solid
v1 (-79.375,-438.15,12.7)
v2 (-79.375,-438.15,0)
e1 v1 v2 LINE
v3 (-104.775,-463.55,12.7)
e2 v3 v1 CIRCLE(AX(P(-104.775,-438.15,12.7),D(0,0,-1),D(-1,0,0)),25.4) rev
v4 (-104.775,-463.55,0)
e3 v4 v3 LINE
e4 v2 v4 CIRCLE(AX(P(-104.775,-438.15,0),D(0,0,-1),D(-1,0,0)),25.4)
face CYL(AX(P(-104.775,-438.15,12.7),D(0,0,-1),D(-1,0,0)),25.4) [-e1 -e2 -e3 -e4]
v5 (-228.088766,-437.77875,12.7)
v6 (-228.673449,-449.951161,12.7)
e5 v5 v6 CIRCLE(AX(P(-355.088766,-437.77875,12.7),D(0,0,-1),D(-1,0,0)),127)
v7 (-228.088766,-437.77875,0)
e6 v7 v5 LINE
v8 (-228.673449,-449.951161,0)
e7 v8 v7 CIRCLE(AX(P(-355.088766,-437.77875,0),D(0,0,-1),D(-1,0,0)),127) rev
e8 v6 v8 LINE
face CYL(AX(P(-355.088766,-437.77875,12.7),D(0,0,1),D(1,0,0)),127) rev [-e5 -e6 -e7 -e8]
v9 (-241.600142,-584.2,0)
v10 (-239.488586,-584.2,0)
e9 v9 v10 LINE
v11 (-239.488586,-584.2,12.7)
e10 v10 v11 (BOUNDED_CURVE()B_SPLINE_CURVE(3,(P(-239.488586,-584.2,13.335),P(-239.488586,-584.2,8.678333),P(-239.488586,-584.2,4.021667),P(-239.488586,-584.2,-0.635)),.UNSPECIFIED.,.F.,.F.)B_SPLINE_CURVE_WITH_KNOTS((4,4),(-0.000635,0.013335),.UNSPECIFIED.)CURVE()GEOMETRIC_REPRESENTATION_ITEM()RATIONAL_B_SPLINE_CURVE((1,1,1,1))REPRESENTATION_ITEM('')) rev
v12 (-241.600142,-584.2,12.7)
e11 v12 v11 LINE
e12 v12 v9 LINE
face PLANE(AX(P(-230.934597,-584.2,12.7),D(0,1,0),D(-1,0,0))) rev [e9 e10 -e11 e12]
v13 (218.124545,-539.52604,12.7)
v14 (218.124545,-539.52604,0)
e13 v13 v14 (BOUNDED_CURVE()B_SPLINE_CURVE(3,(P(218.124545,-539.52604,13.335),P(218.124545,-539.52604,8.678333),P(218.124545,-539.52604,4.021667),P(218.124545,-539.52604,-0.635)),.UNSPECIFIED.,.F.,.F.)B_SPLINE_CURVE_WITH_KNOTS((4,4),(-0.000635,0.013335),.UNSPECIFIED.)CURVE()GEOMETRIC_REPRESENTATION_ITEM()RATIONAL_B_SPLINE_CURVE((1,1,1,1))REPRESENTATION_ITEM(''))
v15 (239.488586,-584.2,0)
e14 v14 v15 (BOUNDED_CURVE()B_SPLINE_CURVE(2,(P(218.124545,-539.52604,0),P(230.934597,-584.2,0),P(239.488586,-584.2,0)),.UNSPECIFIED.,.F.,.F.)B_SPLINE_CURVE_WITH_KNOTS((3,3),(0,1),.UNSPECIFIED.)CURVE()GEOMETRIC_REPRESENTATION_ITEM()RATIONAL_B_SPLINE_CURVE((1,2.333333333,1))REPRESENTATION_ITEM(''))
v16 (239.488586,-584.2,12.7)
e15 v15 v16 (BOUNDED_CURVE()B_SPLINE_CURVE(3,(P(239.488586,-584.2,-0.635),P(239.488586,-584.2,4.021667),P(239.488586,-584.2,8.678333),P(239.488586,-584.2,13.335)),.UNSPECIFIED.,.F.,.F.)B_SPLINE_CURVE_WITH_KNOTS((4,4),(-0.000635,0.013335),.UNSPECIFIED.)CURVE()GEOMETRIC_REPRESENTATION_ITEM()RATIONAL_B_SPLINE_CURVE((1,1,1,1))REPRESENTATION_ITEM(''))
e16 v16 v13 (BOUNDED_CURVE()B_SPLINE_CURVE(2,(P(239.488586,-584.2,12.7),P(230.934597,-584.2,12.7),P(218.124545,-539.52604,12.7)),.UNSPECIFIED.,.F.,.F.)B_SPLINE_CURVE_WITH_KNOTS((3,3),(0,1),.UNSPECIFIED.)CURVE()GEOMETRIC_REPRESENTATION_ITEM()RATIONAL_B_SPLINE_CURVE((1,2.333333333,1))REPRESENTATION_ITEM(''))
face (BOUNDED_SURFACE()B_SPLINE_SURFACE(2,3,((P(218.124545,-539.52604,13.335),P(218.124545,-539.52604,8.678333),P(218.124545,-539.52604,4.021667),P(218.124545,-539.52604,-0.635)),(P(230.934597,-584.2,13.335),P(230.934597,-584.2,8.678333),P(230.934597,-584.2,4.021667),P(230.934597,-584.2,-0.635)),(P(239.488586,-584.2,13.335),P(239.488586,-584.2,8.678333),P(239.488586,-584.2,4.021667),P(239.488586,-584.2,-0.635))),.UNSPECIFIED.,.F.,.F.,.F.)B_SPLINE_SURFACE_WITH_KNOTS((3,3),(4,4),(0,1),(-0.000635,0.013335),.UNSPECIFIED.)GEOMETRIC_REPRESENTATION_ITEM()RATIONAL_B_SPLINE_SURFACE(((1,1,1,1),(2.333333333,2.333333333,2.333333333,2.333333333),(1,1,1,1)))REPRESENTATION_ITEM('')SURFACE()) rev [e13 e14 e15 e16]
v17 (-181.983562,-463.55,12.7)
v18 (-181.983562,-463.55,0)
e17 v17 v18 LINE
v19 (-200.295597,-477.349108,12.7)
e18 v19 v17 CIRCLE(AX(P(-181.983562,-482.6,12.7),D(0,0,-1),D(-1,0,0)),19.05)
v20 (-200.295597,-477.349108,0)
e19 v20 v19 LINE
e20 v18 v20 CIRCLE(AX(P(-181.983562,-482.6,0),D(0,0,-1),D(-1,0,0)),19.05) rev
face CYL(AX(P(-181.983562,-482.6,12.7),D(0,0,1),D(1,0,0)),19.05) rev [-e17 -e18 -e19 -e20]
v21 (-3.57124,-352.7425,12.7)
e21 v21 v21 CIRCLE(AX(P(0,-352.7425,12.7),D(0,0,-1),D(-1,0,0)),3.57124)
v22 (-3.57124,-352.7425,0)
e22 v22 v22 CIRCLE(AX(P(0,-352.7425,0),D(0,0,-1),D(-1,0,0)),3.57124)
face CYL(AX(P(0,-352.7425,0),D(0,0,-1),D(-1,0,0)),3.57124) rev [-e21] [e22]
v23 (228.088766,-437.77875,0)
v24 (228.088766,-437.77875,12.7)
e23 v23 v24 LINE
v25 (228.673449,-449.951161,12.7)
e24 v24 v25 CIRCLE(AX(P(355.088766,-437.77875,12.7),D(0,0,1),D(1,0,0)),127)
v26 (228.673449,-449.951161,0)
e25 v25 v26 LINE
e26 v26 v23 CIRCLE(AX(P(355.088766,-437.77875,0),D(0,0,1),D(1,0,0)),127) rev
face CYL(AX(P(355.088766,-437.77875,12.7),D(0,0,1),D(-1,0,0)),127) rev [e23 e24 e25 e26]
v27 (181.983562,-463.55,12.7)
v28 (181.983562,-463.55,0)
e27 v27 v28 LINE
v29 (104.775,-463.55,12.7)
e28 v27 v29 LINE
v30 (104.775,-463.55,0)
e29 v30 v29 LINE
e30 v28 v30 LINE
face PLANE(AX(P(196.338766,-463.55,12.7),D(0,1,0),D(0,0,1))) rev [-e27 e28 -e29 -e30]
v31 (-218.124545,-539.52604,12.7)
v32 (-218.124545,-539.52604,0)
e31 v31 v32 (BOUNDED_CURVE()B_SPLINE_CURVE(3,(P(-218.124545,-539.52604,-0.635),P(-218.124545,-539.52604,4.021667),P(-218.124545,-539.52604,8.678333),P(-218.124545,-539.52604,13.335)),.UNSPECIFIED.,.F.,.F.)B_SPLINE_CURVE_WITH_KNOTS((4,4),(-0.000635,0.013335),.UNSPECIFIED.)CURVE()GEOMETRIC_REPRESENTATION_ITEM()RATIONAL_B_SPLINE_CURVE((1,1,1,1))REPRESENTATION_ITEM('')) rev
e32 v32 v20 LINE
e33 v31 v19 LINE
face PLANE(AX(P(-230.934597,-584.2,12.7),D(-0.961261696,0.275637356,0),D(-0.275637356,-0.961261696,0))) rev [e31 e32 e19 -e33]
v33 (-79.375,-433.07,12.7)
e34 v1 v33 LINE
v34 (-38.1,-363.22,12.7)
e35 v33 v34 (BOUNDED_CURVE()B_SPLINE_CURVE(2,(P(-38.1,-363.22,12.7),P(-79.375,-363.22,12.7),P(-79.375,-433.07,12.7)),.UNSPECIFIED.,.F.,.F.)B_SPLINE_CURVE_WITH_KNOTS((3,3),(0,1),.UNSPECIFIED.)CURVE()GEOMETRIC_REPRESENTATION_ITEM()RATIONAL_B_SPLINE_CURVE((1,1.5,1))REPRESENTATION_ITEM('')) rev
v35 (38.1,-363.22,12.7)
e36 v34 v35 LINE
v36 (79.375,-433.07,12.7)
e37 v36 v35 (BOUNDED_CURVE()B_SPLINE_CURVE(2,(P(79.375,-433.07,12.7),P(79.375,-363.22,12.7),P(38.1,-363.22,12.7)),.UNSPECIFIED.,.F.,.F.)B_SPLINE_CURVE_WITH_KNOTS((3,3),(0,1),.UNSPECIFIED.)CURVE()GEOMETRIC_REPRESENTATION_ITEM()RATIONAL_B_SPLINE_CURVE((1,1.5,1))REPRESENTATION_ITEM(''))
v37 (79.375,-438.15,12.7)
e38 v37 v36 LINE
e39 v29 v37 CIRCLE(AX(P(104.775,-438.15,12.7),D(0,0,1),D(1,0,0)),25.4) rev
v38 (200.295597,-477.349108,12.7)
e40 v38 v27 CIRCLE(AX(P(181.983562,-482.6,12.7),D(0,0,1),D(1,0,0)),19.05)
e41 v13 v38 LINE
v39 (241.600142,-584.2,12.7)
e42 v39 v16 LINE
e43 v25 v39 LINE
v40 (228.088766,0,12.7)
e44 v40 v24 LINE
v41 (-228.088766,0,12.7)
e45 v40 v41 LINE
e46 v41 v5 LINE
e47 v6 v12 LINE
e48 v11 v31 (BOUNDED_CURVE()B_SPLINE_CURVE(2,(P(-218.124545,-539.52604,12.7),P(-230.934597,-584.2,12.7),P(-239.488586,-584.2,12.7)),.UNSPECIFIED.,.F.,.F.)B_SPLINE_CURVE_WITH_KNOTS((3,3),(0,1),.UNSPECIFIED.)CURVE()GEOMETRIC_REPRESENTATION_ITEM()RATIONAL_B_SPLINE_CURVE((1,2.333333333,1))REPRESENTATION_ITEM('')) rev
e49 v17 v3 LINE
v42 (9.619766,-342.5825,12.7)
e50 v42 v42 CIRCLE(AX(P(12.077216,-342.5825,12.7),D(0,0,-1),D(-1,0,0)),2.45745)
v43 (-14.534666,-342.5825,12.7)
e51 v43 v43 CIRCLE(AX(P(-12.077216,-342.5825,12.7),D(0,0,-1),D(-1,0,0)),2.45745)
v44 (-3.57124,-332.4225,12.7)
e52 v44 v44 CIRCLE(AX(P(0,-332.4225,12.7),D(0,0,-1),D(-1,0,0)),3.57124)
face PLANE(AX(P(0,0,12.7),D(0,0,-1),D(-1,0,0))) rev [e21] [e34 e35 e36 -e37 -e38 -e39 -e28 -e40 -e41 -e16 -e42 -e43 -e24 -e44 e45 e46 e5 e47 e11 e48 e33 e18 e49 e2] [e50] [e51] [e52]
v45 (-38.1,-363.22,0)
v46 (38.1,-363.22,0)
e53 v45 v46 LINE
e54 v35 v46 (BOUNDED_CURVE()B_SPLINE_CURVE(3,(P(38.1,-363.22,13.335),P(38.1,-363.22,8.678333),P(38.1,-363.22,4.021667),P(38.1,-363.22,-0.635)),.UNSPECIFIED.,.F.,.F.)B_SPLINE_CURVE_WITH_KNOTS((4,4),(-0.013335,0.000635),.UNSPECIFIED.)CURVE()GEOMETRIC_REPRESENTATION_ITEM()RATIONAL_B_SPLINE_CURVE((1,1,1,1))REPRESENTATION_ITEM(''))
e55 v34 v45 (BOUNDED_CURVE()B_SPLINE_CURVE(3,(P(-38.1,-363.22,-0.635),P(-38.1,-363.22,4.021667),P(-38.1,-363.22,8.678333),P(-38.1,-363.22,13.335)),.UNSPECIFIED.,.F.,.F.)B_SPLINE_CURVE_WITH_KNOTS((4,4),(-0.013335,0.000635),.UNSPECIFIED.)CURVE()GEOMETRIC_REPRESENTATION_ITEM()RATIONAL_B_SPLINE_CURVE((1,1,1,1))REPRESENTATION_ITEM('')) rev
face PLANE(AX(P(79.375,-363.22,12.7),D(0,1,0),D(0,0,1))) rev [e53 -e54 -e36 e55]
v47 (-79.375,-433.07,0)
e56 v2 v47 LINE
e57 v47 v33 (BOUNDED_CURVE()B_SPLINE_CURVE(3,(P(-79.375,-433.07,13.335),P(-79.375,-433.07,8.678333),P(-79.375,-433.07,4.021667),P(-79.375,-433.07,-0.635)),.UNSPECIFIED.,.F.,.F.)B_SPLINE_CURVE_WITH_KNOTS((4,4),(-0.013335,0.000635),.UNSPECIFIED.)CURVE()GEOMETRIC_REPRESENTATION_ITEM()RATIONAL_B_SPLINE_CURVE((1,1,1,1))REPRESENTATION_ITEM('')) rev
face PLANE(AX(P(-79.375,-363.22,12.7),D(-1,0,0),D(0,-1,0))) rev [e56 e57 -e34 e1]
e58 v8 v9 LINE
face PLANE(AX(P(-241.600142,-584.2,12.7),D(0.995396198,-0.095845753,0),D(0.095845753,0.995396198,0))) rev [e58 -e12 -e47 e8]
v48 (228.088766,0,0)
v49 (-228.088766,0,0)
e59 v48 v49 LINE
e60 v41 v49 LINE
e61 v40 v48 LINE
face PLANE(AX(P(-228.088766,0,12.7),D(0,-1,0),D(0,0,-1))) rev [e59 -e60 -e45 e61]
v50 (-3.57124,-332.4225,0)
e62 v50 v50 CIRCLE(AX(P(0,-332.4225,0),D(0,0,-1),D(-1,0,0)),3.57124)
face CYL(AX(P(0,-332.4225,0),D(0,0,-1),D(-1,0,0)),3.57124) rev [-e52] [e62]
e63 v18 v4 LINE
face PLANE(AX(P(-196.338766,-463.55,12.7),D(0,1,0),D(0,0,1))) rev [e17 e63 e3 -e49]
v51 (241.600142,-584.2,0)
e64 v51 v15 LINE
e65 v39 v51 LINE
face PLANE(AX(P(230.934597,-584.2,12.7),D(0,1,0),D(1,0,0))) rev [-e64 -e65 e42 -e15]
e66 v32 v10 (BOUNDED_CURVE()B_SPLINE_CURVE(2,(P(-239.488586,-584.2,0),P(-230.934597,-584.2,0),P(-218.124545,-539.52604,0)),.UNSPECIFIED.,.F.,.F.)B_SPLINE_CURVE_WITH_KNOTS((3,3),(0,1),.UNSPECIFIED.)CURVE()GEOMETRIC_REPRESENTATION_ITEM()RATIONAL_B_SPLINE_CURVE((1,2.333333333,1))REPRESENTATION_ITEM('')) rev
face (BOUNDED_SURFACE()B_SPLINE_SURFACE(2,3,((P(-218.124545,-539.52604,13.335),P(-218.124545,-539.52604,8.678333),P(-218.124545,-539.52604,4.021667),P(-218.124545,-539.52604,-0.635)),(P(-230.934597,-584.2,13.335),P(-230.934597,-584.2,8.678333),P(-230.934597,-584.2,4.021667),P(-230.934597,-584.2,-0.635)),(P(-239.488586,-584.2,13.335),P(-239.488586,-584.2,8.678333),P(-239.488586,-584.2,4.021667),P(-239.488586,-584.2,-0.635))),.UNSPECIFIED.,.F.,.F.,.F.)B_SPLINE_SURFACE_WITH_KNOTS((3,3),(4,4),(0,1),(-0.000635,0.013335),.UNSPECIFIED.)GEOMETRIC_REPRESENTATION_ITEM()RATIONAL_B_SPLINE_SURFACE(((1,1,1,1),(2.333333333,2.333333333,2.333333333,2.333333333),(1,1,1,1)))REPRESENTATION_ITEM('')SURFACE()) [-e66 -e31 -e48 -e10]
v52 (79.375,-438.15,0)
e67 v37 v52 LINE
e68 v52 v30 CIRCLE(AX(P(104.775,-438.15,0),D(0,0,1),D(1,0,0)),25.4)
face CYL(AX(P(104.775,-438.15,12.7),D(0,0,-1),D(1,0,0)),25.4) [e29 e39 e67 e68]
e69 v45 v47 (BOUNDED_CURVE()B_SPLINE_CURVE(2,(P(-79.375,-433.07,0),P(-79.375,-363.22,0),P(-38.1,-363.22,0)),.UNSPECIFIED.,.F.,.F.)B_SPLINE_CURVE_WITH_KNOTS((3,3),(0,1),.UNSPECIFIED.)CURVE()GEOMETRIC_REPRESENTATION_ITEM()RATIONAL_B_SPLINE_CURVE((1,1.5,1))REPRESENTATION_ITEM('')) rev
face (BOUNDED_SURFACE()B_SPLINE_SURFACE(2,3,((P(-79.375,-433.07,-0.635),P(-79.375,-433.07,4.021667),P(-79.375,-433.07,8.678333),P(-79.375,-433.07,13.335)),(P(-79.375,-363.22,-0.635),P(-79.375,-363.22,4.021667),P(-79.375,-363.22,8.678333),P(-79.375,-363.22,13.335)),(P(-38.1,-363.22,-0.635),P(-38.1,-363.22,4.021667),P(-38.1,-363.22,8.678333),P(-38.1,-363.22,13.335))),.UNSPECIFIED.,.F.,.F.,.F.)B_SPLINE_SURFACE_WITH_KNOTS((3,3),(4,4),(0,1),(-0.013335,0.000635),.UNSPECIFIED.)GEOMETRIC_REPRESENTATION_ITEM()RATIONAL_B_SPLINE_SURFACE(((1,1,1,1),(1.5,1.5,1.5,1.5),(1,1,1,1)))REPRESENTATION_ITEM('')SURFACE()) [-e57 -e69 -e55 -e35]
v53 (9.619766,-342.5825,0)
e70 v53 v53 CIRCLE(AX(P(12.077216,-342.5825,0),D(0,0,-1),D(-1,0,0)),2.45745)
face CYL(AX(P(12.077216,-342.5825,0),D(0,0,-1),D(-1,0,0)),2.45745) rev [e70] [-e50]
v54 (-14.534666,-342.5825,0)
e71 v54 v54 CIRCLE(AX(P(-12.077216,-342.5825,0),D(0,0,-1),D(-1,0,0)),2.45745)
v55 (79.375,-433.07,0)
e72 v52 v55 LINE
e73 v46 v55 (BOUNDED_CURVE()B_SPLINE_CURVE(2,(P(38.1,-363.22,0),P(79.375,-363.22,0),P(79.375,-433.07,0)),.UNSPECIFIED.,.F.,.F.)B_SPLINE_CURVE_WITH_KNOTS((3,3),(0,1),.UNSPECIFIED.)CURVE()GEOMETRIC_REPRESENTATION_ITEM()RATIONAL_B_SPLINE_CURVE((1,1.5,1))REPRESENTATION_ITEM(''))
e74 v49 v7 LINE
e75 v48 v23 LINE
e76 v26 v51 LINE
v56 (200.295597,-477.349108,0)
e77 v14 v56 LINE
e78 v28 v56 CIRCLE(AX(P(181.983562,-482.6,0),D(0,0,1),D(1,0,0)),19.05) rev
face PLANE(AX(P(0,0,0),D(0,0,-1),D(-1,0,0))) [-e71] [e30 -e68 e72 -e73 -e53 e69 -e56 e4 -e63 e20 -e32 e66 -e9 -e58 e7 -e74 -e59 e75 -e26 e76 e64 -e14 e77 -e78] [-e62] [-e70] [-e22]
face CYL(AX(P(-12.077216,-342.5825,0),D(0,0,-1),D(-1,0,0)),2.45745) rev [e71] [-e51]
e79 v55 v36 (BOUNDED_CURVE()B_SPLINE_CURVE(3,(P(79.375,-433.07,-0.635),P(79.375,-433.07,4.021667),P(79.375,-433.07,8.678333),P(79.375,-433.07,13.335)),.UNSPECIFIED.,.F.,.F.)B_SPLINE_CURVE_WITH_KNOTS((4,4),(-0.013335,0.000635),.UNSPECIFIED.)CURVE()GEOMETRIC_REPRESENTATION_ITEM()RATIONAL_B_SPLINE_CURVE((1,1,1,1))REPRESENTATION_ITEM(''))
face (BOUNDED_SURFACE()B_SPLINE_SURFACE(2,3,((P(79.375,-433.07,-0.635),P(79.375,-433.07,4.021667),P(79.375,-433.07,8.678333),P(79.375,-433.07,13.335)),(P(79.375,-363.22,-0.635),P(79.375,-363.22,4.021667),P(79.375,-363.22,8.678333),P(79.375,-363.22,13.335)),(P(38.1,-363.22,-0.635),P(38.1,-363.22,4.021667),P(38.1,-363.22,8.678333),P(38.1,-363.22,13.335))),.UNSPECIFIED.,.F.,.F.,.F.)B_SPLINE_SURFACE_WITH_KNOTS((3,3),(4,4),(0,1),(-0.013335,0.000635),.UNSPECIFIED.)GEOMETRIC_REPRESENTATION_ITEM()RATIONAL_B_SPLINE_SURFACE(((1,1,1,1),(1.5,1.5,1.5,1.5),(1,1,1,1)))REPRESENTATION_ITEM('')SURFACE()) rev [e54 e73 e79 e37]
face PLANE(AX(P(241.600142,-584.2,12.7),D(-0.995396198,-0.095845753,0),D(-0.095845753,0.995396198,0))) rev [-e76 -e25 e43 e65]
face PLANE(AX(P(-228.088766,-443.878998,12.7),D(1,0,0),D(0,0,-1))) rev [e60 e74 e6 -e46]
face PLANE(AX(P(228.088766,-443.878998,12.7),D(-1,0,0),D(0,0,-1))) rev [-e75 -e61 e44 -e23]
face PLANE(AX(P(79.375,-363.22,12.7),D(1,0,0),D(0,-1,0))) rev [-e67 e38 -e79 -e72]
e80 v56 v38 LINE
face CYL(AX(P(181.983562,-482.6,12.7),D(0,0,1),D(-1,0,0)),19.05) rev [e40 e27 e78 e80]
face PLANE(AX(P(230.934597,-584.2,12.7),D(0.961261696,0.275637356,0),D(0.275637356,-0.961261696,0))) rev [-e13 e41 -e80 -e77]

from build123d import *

# Parameters (mm, degrees)
BOSS_EXTRUDE1_DEPTH     = 12.7
FILLET2_SIZE            = 41.275
FILLET2_SIZE_2          = 69.85
FILLET3_R               = 25.4
FILLET4_R               = 19.05
FILLET6_R               = 127
CUT_EXTRUDE1_REACH      = 634.314
SKETCH3_W               = 241.600142069
SKETCH3_H               = 584.2
F_8_CLEARANCE_HOLE1_D   = 4.9149
F_1_4_CLEARANCE_HOLE1_D = 7.14248


with BuildPart() as part:
    # Sketch1 → Boss-Extrude1 (new body)
    with BuildSketch(Plane.XY):
        Polygon((-228.088766336, 0), (228.088766336, 0), (228.088766336, -443.878997916), (241.600142069, -584.2), (230.934597128, -584.2), (196.338766336, -463.55), (79.375, -463.55), (79.375, -363.22), (-79.375, -363.22), (-79.375, -463.55), (-196.338766336, -463.55), (-230.934597128, -584.2), (-241.600142069, -584.2), (-228.088766336, -443.878997916), align=None)
    extrude(amount=BOSS_EXTRUDE1_DEPTH)

    # Fillet2
    # a fillet whose section is not a circle: 69.85, 41.275 mm, written as the material it adds along each edge
    with BuildSketch(Plane(origin=(-79.375, -363.22, 0), x_dir=(1, 0, 0), z_dir=(0, 0, 1))) as fillet2_piece_1:
        with BuildLine():
            Bezier((FILLET2_SIZE, 0), (0, 0), (0, -FILLET2_SIZE_2), weights=[1, 1.5, 1])
            Line((0, -FILLET2_SIZE_2), (0, 0))
            Line((0, 0), (FILLET2_SIZE, 0))
        make_face()
    extrude(amount=12.7)

    # Fillet3
    fillet3_edges = [part.edges().sort_by_distance(p)[0] for p in [
        (-79.375, -463.55, 6.35),
    ]]
    fillet(fillet3_edges, radius=FILLET3_R)

    # Fillet4
    fillet4_edges = [part.edges().sort_by_distance(p)[0] for p in [
        (-196.338766336, -463.55, 6.35),
    ]]
    fillet(fillet4_edges, radius=FILLET4_R)

    # Fillet5
    # a fillet whose section is not a circle: 50.8, 22.225 mm, written as the material it takes off along each edge
    with BuildSketch(Plane(origin=(-230.934597128, -584.2, -116.185737858), x_dir=(0.2756373558169957, 0.9612616959383199, 0), z_dir=(0, 0, 1))) as fillet5_piece_1:
        with BuildLine():
            Bezier((46.474295143, 0), (0, 0), (-2.35779901, 8.222622324), weights=[1, 2.333333333, 1])
            Line((-2.35779901, 8.222622324), (0, 0))
            Line((0, 0), (46.474295143, 0))
        make_face()
    extrude(amount=245.071475716, mode=Mode.SUBTRACT)

    # Fillet6
    # the kernel refuses this fillet: 127 mm, written as the material it adds along each edge
    with BuildSketch(Plane(origin=(-228.088766336, -443.878997916, 0), x_dir=(0, 1, 0), z_dir=(0, 0, 1))) as fillet6_piece_1:
        with BuildLine():
            CenterArc((FILLET6_R * 0.0480334444852, FILLET6_R), FILLET6_R, 264.5, 5.5)
            Line((-FILLET6_R * 0.047812308035, FILLET6_R * 0.00460380163282), (0, 0))
            Line((0, 0), (FILLET6_R * 0.0480334444852, 0))
        make_face()
    extrude(amount=12.7)

    # Sketch3 → Cut-Extrude1 (cut, up to next)
    with BuildSketch(Plane.XY.offset(12.7), mode=Mode.PRIVATE) as cut_extrude1_sk1:
        with Locations((120.800071035, -292.1)):
            Rectangle(SKETCH3_W, SKETCH3_H)
    cut_extrude1_tool1 = extrude(cut_extrude1_sk1.sketch, amount=-CUT_EXTRUDE1_REACH, mode=Mode.PRIVATE) & part.part
    add(cut_extrude1_tool1.solids().sort_by_distance((120.800071, -292.1, 12.7))[0], mode=Mode.SUBTRACT)

    # Mirror5: part across plane


with BuildPart() as part_1:
    add(part.part)
    add(part.part.mirror(Plane(origin=(0, 0, -0.35025), x_dir=(0, 0, 1), z_dir=(-1, 0, 0))))

    # #8 Clearance Hole1 (through all)
    with Locations(Plane(origin=(0, 0, 0), x_dir=(-1, 0, 0), z_dir=(0, 0, -1))):
        with Locations((12.077216058, -342.5825), (-12.077216058, -342.5825)):
            Hole(F_8_CLEARANCE_HOLE1_D / 2)

    # 1/4 Clearance Hole1 (through all)
    with Locations(Plane(origin=(0, 0, 0), x_dir=(-1, 0, 0), z_dir=(0, 0, -1))):
        with Locations((0, -352.7425), (0, -332.4225)):
            Hole(F_1_4_CLEARANCE_HOLE1_D / 2)


solid = part_1.part
